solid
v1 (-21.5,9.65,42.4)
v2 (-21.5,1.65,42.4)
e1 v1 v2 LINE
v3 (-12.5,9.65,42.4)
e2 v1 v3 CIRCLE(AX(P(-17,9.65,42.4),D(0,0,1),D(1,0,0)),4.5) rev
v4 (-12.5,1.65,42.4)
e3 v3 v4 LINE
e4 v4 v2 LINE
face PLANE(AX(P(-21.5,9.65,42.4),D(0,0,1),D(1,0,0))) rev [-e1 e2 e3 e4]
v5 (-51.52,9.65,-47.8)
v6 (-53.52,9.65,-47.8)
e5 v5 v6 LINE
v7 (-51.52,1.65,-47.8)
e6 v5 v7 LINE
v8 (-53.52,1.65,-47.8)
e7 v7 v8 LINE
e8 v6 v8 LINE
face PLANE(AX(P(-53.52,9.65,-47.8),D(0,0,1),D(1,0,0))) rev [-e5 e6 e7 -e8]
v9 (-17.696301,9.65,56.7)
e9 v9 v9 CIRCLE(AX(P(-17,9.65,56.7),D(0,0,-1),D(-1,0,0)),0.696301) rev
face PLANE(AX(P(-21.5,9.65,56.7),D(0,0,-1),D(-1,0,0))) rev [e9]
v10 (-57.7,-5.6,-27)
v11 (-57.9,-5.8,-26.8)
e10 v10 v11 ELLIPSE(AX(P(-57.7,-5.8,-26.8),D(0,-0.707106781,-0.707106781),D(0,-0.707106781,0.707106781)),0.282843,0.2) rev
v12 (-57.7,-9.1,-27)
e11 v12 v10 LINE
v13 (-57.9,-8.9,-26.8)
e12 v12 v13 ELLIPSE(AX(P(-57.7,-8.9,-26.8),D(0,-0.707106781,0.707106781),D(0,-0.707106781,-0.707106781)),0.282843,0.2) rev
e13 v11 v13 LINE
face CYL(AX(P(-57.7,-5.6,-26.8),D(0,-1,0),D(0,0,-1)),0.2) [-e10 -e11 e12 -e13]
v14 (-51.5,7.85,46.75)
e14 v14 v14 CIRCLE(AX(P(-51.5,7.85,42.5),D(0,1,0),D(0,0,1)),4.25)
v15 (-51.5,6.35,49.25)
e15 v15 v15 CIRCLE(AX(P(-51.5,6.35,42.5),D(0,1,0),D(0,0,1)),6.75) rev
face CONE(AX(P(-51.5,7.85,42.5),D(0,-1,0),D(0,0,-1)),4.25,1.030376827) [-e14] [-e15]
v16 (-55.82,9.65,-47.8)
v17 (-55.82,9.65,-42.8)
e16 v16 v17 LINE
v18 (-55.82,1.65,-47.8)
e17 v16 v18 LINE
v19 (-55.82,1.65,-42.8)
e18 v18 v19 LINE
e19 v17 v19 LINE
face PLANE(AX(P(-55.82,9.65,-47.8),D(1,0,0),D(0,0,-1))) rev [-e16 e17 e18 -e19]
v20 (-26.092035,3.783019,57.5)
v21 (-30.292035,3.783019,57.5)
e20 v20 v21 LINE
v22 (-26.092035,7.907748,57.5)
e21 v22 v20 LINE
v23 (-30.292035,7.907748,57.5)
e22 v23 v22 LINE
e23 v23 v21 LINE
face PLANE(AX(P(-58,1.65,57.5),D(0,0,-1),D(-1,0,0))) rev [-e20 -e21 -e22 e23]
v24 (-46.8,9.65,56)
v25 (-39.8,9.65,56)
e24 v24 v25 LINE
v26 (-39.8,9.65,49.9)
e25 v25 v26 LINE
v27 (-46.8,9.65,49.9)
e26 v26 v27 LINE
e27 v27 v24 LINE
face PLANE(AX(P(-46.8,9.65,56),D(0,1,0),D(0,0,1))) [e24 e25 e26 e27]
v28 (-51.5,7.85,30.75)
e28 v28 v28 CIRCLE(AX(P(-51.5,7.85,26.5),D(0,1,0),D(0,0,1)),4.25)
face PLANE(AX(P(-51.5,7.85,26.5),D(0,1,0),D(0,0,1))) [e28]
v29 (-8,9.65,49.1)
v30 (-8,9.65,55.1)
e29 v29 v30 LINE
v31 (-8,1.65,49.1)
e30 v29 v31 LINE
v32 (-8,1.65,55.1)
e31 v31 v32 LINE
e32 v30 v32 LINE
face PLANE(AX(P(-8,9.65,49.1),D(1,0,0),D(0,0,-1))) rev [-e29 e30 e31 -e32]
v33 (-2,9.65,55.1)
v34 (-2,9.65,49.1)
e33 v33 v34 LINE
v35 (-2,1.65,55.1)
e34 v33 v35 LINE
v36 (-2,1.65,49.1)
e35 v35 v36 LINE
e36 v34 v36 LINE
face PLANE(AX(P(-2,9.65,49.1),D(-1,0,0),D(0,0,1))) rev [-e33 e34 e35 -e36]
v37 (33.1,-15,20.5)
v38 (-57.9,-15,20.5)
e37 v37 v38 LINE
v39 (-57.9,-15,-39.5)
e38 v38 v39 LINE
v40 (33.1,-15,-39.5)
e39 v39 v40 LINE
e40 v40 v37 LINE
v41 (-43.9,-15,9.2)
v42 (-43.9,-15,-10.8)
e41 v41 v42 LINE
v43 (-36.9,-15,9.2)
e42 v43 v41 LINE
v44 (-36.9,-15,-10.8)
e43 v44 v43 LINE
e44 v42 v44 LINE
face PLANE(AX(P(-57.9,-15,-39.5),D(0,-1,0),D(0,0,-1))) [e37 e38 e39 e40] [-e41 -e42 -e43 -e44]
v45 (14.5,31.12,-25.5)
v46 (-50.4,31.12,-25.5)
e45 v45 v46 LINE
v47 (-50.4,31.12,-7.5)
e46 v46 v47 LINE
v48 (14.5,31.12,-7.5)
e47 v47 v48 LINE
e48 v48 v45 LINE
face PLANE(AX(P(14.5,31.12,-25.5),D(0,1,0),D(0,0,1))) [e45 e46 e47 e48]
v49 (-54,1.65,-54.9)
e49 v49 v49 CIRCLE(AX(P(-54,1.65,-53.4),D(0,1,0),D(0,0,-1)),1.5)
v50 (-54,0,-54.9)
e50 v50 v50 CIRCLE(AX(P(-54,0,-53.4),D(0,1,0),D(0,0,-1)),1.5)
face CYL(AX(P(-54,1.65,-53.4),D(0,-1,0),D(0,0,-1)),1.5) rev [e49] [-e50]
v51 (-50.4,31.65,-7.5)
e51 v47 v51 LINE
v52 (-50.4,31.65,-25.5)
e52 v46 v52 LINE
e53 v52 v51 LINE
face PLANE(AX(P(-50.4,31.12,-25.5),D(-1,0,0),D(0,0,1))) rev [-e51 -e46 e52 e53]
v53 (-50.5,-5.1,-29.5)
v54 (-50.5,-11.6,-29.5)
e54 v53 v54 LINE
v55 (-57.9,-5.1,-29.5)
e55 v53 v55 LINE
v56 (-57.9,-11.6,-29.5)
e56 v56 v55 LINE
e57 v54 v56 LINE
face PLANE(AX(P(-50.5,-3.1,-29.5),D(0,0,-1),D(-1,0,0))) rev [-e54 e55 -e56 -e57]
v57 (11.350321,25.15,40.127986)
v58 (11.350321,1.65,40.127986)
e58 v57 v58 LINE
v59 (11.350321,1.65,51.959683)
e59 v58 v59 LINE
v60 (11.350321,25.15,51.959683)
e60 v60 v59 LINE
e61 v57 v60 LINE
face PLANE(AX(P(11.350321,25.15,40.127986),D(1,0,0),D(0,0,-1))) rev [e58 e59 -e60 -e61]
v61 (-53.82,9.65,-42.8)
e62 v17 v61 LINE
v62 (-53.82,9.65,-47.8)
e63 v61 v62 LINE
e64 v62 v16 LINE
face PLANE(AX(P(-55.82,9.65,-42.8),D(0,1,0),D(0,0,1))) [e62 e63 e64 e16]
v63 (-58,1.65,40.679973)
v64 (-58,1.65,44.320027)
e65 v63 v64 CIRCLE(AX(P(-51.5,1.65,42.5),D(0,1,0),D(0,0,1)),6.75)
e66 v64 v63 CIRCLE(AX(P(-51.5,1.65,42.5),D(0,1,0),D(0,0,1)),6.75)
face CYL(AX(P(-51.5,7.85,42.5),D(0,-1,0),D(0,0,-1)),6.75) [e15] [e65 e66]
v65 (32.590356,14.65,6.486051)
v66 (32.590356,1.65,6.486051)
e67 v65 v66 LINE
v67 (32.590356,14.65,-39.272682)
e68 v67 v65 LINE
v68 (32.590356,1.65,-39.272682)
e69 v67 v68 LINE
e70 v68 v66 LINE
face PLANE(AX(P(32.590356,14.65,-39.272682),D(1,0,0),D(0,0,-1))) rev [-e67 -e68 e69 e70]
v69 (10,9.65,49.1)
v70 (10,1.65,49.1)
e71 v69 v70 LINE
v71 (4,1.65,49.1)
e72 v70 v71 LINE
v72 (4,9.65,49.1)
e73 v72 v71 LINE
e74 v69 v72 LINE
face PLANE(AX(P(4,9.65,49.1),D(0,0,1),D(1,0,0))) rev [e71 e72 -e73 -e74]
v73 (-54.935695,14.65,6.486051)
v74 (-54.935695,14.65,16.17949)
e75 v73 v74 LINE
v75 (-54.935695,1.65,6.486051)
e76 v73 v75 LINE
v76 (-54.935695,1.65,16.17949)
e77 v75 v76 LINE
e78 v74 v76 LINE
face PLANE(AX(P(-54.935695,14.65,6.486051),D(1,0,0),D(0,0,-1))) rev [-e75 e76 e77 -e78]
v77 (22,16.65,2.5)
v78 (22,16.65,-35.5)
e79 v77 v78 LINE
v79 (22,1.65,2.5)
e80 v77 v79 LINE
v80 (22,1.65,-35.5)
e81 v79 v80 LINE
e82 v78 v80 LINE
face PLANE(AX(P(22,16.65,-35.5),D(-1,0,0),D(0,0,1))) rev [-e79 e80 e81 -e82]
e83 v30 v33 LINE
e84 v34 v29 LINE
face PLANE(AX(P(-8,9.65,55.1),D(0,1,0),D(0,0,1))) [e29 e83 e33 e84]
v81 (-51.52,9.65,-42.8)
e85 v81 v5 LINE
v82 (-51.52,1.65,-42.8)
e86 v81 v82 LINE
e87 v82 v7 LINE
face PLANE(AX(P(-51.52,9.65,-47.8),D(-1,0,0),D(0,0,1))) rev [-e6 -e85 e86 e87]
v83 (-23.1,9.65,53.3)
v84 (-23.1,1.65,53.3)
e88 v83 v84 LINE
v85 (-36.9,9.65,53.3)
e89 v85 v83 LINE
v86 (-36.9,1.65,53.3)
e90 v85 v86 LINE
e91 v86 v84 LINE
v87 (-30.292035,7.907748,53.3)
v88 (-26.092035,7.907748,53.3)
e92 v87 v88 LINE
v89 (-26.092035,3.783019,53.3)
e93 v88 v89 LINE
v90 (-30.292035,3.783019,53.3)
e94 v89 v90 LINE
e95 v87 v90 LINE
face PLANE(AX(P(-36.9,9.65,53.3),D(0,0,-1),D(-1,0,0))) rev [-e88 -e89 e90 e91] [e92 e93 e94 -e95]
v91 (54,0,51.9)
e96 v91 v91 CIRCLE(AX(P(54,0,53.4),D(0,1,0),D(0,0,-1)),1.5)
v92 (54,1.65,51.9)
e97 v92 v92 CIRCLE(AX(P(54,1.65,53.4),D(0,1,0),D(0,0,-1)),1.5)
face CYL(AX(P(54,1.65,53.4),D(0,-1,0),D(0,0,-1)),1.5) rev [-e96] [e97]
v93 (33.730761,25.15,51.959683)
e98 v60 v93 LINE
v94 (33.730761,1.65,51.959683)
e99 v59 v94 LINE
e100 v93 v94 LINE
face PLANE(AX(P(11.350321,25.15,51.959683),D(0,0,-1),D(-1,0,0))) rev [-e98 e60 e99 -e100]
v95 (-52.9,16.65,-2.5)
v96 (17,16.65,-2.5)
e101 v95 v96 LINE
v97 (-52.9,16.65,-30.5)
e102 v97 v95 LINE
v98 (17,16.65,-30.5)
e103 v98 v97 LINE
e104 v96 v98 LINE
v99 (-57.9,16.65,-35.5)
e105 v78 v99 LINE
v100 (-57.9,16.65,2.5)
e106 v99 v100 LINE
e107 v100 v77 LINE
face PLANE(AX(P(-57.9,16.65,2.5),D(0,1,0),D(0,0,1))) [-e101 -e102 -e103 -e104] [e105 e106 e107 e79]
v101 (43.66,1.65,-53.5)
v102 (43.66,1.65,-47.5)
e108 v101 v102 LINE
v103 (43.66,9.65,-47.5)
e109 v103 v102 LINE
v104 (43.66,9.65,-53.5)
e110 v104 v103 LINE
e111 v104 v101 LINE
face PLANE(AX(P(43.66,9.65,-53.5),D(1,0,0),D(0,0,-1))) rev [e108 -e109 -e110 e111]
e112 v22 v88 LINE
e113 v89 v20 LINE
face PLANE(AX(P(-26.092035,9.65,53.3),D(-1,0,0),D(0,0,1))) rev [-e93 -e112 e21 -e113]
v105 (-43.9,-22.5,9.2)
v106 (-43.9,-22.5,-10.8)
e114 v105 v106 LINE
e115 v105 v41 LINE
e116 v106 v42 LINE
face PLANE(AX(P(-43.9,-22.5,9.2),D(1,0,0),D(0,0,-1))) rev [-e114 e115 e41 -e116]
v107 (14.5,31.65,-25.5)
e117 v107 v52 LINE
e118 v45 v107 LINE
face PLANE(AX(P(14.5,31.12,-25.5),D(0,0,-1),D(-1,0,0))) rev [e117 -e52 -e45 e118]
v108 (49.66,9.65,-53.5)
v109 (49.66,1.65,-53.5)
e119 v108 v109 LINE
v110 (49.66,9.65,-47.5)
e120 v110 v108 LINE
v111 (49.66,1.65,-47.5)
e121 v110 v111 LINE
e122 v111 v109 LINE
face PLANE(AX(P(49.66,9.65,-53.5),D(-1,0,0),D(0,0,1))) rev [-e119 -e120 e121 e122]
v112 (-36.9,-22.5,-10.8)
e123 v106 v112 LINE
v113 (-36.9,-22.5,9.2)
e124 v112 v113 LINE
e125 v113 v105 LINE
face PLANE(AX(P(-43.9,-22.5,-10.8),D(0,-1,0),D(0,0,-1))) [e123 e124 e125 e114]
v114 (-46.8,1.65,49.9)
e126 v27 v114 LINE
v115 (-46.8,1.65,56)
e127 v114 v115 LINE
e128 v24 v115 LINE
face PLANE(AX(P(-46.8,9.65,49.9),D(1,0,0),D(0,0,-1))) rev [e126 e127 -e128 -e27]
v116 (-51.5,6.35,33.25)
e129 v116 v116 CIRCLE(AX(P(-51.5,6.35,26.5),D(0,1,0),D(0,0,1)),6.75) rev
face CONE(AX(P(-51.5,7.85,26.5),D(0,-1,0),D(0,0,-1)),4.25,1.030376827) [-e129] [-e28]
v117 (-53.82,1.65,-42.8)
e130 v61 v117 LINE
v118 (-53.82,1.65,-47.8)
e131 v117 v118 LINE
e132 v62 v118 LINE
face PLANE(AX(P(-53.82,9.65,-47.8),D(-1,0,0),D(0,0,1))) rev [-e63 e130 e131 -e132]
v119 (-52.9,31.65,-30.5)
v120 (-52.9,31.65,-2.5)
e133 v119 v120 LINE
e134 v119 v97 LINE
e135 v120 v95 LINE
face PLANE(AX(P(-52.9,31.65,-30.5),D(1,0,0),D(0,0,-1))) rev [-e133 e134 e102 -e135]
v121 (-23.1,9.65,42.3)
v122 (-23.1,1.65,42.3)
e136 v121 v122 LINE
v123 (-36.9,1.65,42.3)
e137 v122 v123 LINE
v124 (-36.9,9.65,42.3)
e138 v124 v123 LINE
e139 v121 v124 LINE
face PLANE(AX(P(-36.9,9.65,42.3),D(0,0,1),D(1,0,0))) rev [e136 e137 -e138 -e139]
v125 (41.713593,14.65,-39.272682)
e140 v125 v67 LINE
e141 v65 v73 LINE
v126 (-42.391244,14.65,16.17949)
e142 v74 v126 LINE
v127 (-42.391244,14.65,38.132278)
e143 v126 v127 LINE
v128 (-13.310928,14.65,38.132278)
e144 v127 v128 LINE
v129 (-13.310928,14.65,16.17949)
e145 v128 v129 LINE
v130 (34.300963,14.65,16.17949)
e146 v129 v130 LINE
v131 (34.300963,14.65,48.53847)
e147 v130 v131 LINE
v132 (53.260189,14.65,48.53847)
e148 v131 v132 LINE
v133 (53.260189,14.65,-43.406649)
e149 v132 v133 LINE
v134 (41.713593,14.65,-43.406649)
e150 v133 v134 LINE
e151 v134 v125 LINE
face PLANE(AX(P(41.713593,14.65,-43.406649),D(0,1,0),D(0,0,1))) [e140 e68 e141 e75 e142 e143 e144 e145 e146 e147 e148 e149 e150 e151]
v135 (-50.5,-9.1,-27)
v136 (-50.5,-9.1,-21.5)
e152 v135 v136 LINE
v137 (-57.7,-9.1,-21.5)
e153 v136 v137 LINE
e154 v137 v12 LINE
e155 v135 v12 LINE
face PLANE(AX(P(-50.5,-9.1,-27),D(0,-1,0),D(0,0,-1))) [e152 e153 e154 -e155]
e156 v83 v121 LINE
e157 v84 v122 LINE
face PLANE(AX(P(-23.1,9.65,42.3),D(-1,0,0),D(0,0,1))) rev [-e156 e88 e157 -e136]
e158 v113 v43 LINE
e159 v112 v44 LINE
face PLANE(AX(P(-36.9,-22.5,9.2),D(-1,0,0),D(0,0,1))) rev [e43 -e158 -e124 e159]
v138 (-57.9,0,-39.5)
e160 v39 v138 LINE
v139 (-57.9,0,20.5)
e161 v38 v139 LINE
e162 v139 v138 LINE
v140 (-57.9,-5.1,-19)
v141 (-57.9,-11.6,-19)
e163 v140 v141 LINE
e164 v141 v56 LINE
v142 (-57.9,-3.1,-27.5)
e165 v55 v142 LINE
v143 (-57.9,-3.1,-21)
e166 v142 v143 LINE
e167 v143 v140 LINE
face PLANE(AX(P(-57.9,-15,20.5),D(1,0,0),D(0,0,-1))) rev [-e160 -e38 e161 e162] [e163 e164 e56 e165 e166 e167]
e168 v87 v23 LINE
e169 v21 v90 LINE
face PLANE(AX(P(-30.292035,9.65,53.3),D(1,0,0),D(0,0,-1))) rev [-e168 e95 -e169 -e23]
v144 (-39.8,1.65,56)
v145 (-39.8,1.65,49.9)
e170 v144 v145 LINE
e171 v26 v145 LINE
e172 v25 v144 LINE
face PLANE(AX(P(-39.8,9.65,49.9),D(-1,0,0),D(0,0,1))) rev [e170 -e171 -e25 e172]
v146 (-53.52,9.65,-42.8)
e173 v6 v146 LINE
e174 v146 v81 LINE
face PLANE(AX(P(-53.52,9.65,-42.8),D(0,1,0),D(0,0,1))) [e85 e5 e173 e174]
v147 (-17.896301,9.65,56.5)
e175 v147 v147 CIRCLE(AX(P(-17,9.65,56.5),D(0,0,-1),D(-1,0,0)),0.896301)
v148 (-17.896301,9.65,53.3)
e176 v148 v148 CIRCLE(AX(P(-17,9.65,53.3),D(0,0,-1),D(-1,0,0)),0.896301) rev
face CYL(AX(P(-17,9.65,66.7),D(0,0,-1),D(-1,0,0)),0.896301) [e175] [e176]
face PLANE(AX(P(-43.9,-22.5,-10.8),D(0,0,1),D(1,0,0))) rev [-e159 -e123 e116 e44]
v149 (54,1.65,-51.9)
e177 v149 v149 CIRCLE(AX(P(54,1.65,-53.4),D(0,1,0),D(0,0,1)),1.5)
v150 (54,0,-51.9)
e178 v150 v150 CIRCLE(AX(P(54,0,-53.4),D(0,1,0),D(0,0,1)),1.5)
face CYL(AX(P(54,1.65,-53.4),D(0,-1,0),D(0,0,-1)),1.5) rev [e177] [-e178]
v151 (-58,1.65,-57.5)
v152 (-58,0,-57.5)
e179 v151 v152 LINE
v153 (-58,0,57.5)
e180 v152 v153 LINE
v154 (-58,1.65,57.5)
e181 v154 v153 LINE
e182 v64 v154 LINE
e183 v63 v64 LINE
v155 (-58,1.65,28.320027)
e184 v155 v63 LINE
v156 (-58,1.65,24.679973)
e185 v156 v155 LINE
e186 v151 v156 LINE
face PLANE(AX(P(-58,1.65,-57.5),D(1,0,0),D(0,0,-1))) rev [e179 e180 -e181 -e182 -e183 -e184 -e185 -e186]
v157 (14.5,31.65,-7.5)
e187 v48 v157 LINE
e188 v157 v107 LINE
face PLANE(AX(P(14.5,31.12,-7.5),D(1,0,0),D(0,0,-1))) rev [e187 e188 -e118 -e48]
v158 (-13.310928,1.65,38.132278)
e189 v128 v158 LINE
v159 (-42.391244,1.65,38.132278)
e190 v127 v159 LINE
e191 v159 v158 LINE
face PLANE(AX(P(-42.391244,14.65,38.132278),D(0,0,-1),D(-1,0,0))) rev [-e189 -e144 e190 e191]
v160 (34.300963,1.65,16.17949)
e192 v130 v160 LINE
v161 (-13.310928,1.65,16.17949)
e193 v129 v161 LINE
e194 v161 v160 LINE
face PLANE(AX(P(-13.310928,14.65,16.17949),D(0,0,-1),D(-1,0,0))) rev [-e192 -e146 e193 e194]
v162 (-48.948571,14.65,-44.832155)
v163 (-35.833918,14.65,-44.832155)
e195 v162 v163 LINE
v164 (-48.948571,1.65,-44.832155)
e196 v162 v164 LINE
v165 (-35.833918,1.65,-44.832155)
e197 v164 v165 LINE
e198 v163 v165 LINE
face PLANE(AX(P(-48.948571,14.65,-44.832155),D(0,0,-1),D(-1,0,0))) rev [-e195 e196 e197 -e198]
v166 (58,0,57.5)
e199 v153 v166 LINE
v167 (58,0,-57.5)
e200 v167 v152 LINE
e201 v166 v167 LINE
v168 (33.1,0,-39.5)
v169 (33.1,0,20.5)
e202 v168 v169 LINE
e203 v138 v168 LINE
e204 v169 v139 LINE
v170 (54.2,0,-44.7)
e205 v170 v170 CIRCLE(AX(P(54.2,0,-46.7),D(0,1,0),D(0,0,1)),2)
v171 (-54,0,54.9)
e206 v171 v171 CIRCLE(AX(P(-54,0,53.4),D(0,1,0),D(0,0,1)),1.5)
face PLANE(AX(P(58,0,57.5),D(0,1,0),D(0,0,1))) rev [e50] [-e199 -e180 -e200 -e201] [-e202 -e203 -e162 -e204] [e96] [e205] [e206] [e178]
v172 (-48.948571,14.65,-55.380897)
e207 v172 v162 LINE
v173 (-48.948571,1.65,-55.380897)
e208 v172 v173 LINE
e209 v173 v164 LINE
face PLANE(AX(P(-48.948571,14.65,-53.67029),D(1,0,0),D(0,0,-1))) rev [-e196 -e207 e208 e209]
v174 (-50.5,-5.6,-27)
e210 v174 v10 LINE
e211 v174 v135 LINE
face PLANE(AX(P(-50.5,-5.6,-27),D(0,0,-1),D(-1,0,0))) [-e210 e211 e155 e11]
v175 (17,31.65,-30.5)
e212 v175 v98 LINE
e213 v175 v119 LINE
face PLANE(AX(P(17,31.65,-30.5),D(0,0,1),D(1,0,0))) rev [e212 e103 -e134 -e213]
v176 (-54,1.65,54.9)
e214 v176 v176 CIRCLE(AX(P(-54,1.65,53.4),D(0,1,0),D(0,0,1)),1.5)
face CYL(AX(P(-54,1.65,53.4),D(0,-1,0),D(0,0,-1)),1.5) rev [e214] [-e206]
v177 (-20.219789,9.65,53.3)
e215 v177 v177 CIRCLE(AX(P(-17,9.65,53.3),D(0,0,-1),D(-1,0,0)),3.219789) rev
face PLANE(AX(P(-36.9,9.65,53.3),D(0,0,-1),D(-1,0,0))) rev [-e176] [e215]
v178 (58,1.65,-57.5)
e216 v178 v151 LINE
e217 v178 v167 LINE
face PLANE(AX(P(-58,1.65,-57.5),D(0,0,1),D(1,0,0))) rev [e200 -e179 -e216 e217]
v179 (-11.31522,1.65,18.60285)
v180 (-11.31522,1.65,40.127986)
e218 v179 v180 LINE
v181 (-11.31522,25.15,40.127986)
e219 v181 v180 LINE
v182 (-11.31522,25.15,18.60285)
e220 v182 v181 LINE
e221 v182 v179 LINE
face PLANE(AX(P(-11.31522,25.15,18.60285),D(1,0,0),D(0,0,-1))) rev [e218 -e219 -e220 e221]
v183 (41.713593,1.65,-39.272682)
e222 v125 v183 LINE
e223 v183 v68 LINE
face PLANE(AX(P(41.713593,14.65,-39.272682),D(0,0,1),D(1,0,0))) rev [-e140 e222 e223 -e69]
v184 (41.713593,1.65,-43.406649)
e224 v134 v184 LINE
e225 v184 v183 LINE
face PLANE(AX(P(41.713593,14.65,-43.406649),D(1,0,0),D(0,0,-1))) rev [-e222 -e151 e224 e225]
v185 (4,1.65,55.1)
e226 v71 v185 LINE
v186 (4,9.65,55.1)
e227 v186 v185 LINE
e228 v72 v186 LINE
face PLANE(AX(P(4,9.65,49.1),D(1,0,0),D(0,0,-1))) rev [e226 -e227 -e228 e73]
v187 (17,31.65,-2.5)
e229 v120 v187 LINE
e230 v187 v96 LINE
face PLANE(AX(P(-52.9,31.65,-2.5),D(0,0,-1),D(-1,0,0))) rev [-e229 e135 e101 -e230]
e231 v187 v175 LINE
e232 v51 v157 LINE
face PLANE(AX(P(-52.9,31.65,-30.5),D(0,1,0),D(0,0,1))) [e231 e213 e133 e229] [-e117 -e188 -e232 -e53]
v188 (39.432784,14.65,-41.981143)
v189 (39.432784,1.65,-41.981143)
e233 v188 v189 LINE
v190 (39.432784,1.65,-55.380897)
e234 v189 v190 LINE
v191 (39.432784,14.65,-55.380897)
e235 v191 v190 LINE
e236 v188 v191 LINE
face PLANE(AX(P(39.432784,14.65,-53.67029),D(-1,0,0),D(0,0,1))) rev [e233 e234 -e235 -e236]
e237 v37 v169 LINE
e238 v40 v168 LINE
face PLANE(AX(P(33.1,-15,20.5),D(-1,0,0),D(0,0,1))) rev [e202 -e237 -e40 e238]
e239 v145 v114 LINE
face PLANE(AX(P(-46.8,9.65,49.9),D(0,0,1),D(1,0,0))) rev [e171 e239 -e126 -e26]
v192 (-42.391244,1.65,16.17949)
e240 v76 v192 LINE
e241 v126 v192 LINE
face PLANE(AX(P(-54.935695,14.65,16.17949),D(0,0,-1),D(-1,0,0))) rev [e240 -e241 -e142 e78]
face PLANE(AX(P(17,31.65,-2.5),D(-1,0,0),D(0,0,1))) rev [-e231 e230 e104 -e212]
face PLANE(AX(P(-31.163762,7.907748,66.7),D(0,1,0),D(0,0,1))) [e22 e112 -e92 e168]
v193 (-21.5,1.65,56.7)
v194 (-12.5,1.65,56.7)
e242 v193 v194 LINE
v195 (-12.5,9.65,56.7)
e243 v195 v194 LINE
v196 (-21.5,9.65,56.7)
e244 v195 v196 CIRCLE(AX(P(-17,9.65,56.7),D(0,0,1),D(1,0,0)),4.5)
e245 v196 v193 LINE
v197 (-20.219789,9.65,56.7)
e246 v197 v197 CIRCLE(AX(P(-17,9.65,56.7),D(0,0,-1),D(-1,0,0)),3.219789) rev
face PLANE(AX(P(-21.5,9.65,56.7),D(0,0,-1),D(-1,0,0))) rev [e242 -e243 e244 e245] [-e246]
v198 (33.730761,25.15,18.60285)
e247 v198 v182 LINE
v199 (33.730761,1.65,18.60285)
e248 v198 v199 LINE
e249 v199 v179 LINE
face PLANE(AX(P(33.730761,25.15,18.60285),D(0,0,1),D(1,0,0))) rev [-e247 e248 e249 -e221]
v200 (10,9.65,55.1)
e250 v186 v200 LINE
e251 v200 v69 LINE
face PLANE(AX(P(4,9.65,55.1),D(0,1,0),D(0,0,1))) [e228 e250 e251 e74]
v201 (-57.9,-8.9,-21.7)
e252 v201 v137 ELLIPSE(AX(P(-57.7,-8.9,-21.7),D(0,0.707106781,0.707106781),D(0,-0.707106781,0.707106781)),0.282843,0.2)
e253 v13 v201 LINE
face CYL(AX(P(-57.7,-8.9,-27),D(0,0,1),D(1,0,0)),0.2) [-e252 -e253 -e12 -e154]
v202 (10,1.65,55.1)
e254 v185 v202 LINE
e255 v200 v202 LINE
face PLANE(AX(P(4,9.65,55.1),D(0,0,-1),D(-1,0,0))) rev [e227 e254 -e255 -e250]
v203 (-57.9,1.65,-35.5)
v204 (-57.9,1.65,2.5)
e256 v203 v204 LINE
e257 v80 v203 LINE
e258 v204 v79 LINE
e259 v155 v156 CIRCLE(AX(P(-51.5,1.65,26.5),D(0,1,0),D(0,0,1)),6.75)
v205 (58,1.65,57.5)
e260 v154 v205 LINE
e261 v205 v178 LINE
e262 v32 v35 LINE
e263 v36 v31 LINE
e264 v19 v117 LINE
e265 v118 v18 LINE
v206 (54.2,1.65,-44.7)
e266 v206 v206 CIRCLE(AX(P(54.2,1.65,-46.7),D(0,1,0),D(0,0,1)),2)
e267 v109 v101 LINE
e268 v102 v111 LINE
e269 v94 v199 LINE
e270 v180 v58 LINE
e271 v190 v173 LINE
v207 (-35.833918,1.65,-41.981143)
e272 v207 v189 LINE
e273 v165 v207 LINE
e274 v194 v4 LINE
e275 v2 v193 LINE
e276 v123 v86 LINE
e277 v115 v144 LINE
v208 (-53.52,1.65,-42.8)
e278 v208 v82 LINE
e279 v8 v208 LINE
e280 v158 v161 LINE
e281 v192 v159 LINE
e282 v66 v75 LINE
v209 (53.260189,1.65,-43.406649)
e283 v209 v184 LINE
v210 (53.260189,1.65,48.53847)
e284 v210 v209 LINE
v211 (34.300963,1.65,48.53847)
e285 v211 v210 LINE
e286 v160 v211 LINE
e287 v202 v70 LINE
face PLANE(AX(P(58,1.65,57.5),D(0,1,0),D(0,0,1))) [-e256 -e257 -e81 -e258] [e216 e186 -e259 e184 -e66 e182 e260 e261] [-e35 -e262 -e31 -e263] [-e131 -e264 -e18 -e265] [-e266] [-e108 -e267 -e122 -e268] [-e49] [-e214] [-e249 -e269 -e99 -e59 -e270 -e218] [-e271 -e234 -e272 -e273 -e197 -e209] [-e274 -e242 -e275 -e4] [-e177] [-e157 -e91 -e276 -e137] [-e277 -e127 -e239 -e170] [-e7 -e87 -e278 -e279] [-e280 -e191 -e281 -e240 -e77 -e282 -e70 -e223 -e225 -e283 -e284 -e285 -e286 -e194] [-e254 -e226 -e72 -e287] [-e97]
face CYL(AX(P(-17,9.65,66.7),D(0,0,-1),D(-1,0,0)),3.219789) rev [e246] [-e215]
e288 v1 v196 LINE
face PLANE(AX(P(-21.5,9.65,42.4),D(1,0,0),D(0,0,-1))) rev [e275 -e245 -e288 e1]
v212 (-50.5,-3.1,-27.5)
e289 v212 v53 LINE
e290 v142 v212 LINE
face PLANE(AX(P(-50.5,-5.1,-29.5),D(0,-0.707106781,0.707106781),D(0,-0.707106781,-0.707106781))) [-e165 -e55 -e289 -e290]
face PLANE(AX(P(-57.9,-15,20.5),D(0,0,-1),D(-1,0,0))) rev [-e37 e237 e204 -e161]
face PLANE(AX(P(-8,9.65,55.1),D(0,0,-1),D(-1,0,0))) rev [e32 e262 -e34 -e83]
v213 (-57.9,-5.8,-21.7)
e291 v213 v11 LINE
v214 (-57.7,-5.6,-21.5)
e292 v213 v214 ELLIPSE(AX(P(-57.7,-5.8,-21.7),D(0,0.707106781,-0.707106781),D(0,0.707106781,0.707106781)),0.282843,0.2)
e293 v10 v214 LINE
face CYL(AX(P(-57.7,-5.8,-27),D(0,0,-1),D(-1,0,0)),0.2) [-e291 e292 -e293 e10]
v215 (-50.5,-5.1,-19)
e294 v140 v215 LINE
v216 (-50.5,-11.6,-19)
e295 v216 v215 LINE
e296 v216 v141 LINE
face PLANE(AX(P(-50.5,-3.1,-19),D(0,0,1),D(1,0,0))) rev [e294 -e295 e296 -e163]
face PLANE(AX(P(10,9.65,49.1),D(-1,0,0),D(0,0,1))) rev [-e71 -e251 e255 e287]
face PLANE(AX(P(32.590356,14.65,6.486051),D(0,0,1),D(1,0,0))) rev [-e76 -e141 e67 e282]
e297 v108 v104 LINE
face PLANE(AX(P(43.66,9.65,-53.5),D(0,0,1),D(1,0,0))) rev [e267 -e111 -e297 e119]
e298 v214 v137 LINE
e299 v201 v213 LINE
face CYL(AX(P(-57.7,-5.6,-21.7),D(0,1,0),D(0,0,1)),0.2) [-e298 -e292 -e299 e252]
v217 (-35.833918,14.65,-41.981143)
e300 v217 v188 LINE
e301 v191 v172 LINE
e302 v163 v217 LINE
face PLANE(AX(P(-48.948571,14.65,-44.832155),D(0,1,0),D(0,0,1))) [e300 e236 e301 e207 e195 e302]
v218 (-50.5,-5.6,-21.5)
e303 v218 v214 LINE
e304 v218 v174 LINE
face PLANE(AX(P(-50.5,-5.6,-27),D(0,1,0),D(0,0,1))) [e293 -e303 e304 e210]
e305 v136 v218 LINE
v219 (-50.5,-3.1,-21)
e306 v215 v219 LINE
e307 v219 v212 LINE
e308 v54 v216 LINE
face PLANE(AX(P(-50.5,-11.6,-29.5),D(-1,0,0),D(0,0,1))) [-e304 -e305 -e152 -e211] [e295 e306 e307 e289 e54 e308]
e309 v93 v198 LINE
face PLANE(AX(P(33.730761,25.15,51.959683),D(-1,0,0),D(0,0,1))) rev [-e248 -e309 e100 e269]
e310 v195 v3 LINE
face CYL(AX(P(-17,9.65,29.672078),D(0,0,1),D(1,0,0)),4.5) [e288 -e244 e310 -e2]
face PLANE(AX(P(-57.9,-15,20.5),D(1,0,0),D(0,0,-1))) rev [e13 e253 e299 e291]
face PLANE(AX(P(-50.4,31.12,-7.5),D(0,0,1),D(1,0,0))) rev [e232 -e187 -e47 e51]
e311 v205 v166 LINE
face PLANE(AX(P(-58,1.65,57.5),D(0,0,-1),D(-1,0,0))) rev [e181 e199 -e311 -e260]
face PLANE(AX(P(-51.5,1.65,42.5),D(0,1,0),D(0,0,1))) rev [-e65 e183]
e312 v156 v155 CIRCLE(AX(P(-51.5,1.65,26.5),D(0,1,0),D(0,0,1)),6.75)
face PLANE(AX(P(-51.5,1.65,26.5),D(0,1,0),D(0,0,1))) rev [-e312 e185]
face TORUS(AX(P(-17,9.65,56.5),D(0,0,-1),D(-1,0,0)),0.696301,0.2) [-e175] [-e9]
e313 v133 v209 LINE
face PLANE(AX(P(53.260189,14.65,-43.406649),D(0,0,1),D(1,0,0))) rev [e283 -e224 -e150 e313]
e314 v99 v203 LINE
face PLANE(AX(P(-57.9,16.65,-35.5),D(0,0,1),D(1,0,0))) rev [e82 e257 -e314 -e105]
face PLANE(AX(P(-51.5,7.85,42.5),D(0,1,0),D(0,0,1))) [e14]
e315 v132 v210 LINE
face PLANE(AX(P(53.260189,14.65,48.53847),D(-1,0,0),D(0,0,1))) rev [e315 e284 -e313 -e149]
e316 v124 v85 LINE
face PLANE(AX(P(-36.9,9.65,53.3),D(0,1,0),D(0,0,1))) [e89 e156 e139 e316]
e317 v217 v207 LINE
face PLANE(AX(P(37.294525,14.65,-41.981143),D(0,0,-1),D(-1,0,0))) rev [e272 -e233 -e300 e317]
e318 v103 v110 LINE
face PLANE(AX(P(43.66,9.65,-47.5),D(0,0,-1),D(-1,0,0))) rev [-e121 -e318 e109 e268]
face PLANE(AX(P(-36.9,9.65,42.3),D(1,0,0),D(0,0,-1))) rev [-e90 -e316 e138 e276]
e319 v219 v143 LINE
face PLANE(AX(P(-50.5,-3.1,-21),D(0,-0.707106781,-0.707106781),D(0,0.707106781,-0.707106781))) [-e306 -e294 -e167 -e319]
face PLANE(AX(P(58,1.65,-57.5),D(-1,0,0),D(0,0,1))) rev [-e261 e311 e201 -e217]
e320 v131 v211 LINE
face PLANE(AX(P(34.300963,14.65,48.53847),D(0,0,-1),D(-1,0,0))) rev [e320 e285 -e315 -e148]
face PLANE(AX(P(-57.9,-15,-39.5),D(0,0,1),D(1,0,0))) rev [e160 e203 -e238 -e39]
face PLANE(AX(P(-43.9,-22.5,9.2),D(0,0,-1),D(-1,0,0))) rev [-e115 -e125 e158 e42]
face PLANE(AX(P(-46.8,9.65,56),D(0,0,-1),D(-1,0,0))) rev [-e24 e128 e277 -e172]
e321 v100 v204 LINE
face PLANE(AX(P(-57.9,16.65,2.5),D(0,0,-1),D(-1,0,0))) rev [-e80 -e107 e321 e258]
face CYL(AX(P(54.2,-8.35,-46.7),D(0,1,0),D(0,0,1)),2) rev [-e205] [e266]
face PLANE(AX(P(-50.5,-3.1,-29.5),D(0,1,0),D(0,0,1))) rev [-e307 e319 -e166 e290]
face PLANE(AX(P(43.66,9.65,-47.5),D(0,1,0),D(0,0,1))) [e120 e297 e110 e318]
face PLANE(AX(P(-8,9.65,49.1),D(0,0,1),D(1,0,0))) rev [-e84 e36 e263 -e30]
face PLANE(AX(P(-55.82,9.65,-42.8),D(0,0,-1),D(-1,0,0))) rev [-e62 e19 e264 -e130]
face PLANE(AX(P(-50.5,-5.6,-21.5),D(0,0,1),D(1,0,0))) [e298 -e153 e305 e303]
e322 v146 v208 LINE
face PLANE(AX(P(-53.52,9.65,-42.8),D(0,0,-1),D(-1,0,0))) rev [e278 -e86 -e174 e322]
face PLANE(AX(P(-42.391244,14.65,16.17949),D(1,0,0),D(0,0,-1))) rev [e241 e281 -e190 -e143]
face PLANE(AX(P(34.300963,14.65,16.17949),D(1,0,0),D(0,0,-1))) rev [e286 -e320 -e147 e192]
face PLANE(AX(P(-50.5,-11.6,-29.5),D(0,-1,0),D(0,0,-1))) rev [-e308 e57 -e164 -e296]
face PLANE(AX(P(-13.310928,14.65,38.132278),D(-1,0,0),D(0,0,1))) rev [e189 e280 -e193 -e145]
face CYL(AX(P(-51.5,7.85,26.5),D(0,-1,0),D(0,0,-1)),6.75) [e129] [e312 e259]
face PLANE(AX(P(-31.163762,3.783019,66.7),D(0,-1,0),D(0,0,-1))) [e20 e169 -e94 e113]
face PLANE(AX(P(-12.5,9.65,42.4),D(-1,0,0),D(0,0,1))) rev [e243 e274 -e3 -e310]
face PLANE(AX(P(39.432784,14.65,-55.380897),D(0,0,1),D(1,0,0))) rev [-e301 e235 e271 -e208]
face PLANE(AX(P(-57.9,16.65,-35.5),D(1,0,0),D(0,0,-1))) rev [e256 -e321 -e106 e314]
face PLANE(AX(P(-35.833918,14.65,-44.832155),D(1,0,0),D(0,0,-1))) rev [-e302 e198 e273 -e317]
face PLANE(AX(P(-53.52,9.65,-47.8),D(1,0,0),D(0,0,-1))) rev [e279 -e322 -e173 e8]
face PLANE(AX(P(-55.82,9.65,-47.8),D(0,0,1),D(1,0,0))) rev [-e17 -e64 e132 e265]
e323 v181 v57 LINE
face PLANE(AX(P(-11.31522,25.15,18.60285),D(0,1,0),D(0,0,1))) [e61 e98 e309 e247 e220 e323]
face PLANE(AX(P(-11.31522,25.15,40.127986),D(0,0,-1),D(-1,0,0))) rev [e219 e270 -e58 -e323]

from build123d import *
from OCP.BRepFilletAPI import BRepFilletAPI_MakeChamfer

# Parameters (mm, degrees)
SKETCH1_W              = 116
SKETCH1_H              = 115
SKETCH1_R              = 1.5
BASE_FLANGE1_DEPTH     = 1.65
SKETCH3_W              = 79.9
SKETCH3_H              = 38
EXTRUDE1_DEPTH         = 15
SKETCH4_W              = 69.9
SKETCH4_H              = 28
EXTRUDE2_DEPTH         = 15
SKETCH6_W              = 64.9
SKETCH6_H              = 18
DISPLAY_DEPTH          = 0.53
SKETCH7_W              = 91
SKETCH7_H              = 60
WIRING_BOARD_DEPTH     = 15
SKETCH8_W              = 7
SKETCH8_H              = 20
EXTRUDE5_DEPTH         = 7.5
SKETCH9_W              = 10.5
SKETCH9_H              = 8.5
SKETCH9_W_2            = 5.5
SKETCH9_H_2            = 3.5
USB_DEPTH              = 7.5
CHAMFER1_SIZE          = 2
SKETCH10_R             = 6.75
POTENTIOMETERS_DEPTH   = 6.2
SKETCH11_W             = 7
SKETCH11_H             = 6.1
SKETCH11_W_2           = 9
SKETCH11_H_2           = 14.3
SKETCH11_W_3           = 6
SKETCH11_H_3           = 6
SKETCH11_W_4           = 2
SKETCH11_H_4           = 5
KEEP_ACCESSIBLE_DEPTH  = 8
EXTRUDE9_DEPTH         = 13
HOT_VOLTAGE_REGS_DEPTH = 23.5
SKETCH14_R             = 4.5
EXTRUDE10_DEPTH        = 14.3
EXTRUDE11_DEPTH        = 10
EXTRUDE11_DEPTH_BACK   = 3.4
SKETCH15_R             = 3.219788924
SKETCH15_R_2           = 0.896300673
SKETCH15_W             = 5.949829442
SKETCH15_H             = 2.638553101
SKETCH15_H_2           = 2.133019186
FILLET1_R              = 0.2
CHAMFER2_SIZE          = 1.5
CHAMFER2_SIZE2         = 2.5
SKETCH16_R             = 2
EXTRUDE12_DEPTH        = 10


# Sheet-metal steps are written as plain solids
with BuildPart() as part:
    # Sketch1 → Base-Flange1 (new body)
    with BuildSketch(Plane(origin=(0, 0, 0), x_dir=(1, 0, 0), z_dir=(0, 1, 0))):
        Rectangle(SKETCH1_W, SKETCH1_H)
        with Locations(Location((54, 53.4, 0), (0, 0, 270))):
            Circle(SKETCH1_R, mode=Mode.SUBTRACT)
        with Locations(Location((54, -53.4, 0), (0, 0, 90))):
            Circle(SKETCH1_R, mode=Mode.SUBTRACT)
        with Locations(Location((-54, 53.4, 0), (0, 0, 90))):
            Circle(SKETCH1_R, mode=Mode.SUBTRACT)
        with Locations(Location((-54, -53.4, 0), (0, 0, 270))):
            Circle(SKETCH1_R, mode=Mode.SUBTRACT)
    extrude(amount=BASE_FLANGE1_DEPTH)

    # Sketch3 → Extrude1 (add)
    with BuildSketch(Plane(origin=(0, 1.65, 0), x_dir=(1, 0, 0), z_dir=(0, 1, 0))):
        with Locations((-17.95, 16.5)):
            Rectangle(SKETCH3_W, SKETCH3_H)
    extrude(amount=EXTRUDE1_DEPTH)

    # Sketch4 → Extrude2 (add)
    with BuildSketch(Plane(origin=(0, 16.65, 0), x_dir=(1, 0, 0), z_dir=(0, 1, 0))):
        with Locations((-17.95, 16.5)):
            Rectangle(SKETCH4_W, SKETCH4_H)
    extrude(amount=EXTRUDE2_DEPTH)

    # Sketch6 → Display! (cut)
    with BuildSketch(Plane(origin=(0, 31.65, 0), x_dir=(1, 0, 0), z_dir=(0, 1, 0))):
        with Locations((-17.95, 16.5)):
            Rectangle(SKETCH6_W, SKETCH6_H)
    extrude(amount=-DISPLAY_DEPTH, mode=Mode.SUBTRACT)

    # Sketch7 → Wiring Board (add)
    with BuildSketch(Plane.XZ):
        with Locations((-12.4, -9.5)):
            Rectangle(SKETCH7_W, SKETCH7_H)
    extrude(amount=WIRING_BOARD_DEPTH)

    # Sketch8 → Extrude5 (add)
    with BuildSketch(Plane.XZ.offset(15)):
        with Locations((-40.4, -0.8)):
            Rectangle(SKETCH8_W, SKETCH8_H)
    extrude(amount=EXTRUDE5_DEPTH)

    # Sketch9 → USB (cut)
    with BuildSketch(Plane.ZY.offset(58)):
        with Locations((-24.25, -7.35)):
            Rectangle(SKETCH9_W, SKETCH9_H)
        with Locations((-24.25, -7.35)):
            Rectangle(SKETCH9_W_2, SKETCH9_H_2, mode=Mode.SUBTRACT)
    extrude(amount=-USB_DEPTH, mode=Mode.SUBTRACT)

    # Chamfer1
    chamfer1_edges = [part.edges().sort_by_distance(p)[0] for p in [
        (-54.2, -3.1, -19),
        (-54.2, -3.1, -29.5),
    ]]
    chamfer(chamfer1_edges, length=CHAMFER1_SIZE)

    # Sketch10 → Potentiometers (add)
    with BuildSketch(Plane(origin=(0, 1.65, 0), x_dir=(1, 0, 0), z_dir=(0, 1, 0))):
        with Locations(Location((-51.5, -26.5, 0), (0, 0, 164.357528987))):
            Circle(SKETCH10_R)
        with Locations(Location((-51.5, -42.5, 0), (0, 0, 164.357528987))):
            Circle(SKETCH10_R)
    extrude(amount=POTENTIOMETERS_DEPTH)

    # Sketch11 → Keep Accessible!! (add)
    with BuildSketch(Plane(origin=(0, 1.65, 0), x_dir=(1, 0, 0), z_dir=(0, 1, 0))):
        Polygon((-26.092034571, -53.3), (-23.1, -53.3), (-23.1, -42.3), (-36.9, -42.3), (-36.9, -53.3), (-30.292034571, -53.3), (-30.292034571, -57.5), (-26.092034571, -57.5), align=None)
        with Locations((-43.3, -52.95)):
            Rectangle(SKETCH11_W, SKETCH11_H)
        with Locations((-17, -49.55)):
            Rectangle(SKETCH11_W_2, SKETCH11_H_2)
        with Locations((-5, -52.1)):
            Rectangle(SKETCH11_W_3, SKETCH11_H_3)
        with Locations((7, -52.1)):
            Rectangle(SKETCH11_W_3, SKETCH11_H_3)
        with Locations((46.66, 50.5)):
            Rectangle(SKETCH11_W_3, SKETCH11_H_3)
        with Locations((-54.82, 45.3)):
            Rectangle(SKETCH11_W_4, SKETCH11_H_4)
        with Locations((-52.52, 45.3)):
            Rectangle(SKETCH11_W_4, SKETCH11_H_4)
    extrude(amount=KEEP_ACCESSIBLE_DEPTH)

    # Sketch12 → Extrude9 (add)
    with BuildSketch(Plane(origin=(0, 1.65, 0), x_dir=(1, 0, 0), z_dir=(0, 1, 0))):
        Polygon((-48.948570669, 53.670290093), (-48.948570669, 44.832154672), (-35.833918109, 44.832154672), (-35.833918109, 41.981143246), (37.294524965, 41.981143246), (39.432783534, 41.981143246), (39.432783534, 53.670290093), (39.432783534, 55.380896948), (-48.948570669, 55.380896948), align=None)
        Polygon((41.713592675, 43.406648959), (41.713592675, 39.272682392), (32.590356112, 39.272682392), (32.590356112, -6.486050994), (-54.935694663, -6.486050994), (-54.935694663, -16.179489842), (-42.391244389, -16.179489842), (-42.391244389, -38.132277821), (-13.310927845, -38.132277821), (-13.310927845, -16.179489842), (34.300962968, -16.179489842), (34.300962968, -48.538469526), (53.26018895, -48.538469526), (53.26018895, 43.406648959), align=None)
    extrude(amount=EXTRUDE9_DEPTH)

    # Sketch13 → Hot! Voltage Regs (add)
    with BuildSketch(Plane(origin=(0, 1.65, 0), x_dir=(1, 0, 0), z_dir=(0, 1, 0))):
        Polygon((-11.315219847, -18.602849554), (-11.315219847, -40.12798582), (11.350320989, -40.12798582), (11.350320989, -51.959683237), (33.730760683, -51.959683237), (33.730760683, -18.602849554), align=None)
    extrude(amount=HOT_VOLTAGE_REGS_DEPTH)

    # Sketch14 → Extrude10 (add)
    with BuildSketch(Plane.XY.offset(56.7)):
        with Locations((-17, 9.65)):
            Circle(SKETCH14_R)
    extrude(amount=-EXTRUDE10_DEPTH)

    # Sketch15 → Extrude11 (cut, two sides: drawn at the far end of the back side and taken through both)
    # profile 1 of 3: a face of its own
    with BuildSketch(Plane.XY.offset(56.7).offset(-EXTRUDE11_DEPTH_BACK)):
        with Locations(Location((-17, 9.65, 0), (0, 0, 180))):
            Circle(SKETCH15_R)
        with Locations(Location((-17, 9.65, 0), (0, 0, 180))):
            Circle(SKETCH15_R_2, mode=Mode.SUBTRACT)
    # profile 2 of 3: a face of its own
    with BuildSketch(Plane.XY.offset(56.7).offset(-EXTRUDE11_DEPTH_BACK)):
        with Locations((-28.188847243, 9.227024123)):
            Rectangle(SKETCH15_W, SKETCH15_H)
    # profile 3 of 3: a face of its own
    with BuildSketch(Plane.XY.offset(56.7).offset(-EXTRUDE11_DEPTH_BACK)):
        with Locations((-28.188847243, 2.716509593)):
            Rectangle(SKETCH15_W, SKETCH15_H_2)
    extrude(amount=EXTRUDE11_DEPTH + EXTRUDE11_DEPTH_BACK, mode=Mode.SUBTRACT)

    # Fillet1
    fillet1_edges = [part.edges().sort_by_distance(p)[0] for p in [
        (-16.103699327, 9.65, 56.7),
        (-57.9, -9.1, -24.25),
        (-57.9, -7.35, -21.5),
        (-57.9, -5.6, -24.25),
        (-57.9, -7.35, -27),
    ]]
    fillet(fillet1_edges, radius=FILLET1_R)

    # Chamfer2: one chamfer whose edges measure the first distance from different faces: ONE call of the kernel's chamfer builder (chamfer() names one face for all edges)
    chamfer2_edges_1 = [part.edges().sort_by_distance(p)[0] for p in [
        (-45, 7.85, 28.320027472),
    ]]
    chamfer2_side_1 = [part.faces().sort_by_distance(p)[0] for p in [
        (-45, 4.75, 28.320027472),
    ]]
    chamfer2_edges_2 = [part.edges().sort_by_distance(p)[0] for p in [
        (-45, 7.85, 44.320027472),
    ]]
    chamfer2_side_2 = [part.faces().sort_by_distance(p)[0] for p in [
        (-45, 4.75, 44.320027472),
    ]]
    chamfer2 = BRepFilletAPI_MakeChamfer(part.part.solid().wrapped)
    for e in chamfer2_edges_1:
        chamfer2.Add(CHAMFER2_SIZE, CHAMFER2_SIZE2, e.wrapped, chamfer2_side_1[0].wrapped)  # the first distance lies on this face
    for e in chamfer2_edges_2:
        chamfer2.Add(CHAMFER2_SIZE, CHAMFER2_SIZE2, e.wrapped, chamfer2_side_2[0].wrapped)  # the first distance lies on this face
    add(Compound.cast(chamfer2.Shape()), mode=Mode.REPLACE)

    # Sketch16 → Extrude12 (cut)
    with BuildSketch(Plane(origin=(0, 1.65, 0), x_dir=(1, 0, 0), z_dir=(0, 1, 0))):
        with Locations(Location((54.2, 46.7, 0), (0, 0, 270))):
            Circle(SKETCH16_R)
    extrude(amount=-EXTRUDE12_DEPTH, mode=Mode.SUBTRACT)


solid = part.part
